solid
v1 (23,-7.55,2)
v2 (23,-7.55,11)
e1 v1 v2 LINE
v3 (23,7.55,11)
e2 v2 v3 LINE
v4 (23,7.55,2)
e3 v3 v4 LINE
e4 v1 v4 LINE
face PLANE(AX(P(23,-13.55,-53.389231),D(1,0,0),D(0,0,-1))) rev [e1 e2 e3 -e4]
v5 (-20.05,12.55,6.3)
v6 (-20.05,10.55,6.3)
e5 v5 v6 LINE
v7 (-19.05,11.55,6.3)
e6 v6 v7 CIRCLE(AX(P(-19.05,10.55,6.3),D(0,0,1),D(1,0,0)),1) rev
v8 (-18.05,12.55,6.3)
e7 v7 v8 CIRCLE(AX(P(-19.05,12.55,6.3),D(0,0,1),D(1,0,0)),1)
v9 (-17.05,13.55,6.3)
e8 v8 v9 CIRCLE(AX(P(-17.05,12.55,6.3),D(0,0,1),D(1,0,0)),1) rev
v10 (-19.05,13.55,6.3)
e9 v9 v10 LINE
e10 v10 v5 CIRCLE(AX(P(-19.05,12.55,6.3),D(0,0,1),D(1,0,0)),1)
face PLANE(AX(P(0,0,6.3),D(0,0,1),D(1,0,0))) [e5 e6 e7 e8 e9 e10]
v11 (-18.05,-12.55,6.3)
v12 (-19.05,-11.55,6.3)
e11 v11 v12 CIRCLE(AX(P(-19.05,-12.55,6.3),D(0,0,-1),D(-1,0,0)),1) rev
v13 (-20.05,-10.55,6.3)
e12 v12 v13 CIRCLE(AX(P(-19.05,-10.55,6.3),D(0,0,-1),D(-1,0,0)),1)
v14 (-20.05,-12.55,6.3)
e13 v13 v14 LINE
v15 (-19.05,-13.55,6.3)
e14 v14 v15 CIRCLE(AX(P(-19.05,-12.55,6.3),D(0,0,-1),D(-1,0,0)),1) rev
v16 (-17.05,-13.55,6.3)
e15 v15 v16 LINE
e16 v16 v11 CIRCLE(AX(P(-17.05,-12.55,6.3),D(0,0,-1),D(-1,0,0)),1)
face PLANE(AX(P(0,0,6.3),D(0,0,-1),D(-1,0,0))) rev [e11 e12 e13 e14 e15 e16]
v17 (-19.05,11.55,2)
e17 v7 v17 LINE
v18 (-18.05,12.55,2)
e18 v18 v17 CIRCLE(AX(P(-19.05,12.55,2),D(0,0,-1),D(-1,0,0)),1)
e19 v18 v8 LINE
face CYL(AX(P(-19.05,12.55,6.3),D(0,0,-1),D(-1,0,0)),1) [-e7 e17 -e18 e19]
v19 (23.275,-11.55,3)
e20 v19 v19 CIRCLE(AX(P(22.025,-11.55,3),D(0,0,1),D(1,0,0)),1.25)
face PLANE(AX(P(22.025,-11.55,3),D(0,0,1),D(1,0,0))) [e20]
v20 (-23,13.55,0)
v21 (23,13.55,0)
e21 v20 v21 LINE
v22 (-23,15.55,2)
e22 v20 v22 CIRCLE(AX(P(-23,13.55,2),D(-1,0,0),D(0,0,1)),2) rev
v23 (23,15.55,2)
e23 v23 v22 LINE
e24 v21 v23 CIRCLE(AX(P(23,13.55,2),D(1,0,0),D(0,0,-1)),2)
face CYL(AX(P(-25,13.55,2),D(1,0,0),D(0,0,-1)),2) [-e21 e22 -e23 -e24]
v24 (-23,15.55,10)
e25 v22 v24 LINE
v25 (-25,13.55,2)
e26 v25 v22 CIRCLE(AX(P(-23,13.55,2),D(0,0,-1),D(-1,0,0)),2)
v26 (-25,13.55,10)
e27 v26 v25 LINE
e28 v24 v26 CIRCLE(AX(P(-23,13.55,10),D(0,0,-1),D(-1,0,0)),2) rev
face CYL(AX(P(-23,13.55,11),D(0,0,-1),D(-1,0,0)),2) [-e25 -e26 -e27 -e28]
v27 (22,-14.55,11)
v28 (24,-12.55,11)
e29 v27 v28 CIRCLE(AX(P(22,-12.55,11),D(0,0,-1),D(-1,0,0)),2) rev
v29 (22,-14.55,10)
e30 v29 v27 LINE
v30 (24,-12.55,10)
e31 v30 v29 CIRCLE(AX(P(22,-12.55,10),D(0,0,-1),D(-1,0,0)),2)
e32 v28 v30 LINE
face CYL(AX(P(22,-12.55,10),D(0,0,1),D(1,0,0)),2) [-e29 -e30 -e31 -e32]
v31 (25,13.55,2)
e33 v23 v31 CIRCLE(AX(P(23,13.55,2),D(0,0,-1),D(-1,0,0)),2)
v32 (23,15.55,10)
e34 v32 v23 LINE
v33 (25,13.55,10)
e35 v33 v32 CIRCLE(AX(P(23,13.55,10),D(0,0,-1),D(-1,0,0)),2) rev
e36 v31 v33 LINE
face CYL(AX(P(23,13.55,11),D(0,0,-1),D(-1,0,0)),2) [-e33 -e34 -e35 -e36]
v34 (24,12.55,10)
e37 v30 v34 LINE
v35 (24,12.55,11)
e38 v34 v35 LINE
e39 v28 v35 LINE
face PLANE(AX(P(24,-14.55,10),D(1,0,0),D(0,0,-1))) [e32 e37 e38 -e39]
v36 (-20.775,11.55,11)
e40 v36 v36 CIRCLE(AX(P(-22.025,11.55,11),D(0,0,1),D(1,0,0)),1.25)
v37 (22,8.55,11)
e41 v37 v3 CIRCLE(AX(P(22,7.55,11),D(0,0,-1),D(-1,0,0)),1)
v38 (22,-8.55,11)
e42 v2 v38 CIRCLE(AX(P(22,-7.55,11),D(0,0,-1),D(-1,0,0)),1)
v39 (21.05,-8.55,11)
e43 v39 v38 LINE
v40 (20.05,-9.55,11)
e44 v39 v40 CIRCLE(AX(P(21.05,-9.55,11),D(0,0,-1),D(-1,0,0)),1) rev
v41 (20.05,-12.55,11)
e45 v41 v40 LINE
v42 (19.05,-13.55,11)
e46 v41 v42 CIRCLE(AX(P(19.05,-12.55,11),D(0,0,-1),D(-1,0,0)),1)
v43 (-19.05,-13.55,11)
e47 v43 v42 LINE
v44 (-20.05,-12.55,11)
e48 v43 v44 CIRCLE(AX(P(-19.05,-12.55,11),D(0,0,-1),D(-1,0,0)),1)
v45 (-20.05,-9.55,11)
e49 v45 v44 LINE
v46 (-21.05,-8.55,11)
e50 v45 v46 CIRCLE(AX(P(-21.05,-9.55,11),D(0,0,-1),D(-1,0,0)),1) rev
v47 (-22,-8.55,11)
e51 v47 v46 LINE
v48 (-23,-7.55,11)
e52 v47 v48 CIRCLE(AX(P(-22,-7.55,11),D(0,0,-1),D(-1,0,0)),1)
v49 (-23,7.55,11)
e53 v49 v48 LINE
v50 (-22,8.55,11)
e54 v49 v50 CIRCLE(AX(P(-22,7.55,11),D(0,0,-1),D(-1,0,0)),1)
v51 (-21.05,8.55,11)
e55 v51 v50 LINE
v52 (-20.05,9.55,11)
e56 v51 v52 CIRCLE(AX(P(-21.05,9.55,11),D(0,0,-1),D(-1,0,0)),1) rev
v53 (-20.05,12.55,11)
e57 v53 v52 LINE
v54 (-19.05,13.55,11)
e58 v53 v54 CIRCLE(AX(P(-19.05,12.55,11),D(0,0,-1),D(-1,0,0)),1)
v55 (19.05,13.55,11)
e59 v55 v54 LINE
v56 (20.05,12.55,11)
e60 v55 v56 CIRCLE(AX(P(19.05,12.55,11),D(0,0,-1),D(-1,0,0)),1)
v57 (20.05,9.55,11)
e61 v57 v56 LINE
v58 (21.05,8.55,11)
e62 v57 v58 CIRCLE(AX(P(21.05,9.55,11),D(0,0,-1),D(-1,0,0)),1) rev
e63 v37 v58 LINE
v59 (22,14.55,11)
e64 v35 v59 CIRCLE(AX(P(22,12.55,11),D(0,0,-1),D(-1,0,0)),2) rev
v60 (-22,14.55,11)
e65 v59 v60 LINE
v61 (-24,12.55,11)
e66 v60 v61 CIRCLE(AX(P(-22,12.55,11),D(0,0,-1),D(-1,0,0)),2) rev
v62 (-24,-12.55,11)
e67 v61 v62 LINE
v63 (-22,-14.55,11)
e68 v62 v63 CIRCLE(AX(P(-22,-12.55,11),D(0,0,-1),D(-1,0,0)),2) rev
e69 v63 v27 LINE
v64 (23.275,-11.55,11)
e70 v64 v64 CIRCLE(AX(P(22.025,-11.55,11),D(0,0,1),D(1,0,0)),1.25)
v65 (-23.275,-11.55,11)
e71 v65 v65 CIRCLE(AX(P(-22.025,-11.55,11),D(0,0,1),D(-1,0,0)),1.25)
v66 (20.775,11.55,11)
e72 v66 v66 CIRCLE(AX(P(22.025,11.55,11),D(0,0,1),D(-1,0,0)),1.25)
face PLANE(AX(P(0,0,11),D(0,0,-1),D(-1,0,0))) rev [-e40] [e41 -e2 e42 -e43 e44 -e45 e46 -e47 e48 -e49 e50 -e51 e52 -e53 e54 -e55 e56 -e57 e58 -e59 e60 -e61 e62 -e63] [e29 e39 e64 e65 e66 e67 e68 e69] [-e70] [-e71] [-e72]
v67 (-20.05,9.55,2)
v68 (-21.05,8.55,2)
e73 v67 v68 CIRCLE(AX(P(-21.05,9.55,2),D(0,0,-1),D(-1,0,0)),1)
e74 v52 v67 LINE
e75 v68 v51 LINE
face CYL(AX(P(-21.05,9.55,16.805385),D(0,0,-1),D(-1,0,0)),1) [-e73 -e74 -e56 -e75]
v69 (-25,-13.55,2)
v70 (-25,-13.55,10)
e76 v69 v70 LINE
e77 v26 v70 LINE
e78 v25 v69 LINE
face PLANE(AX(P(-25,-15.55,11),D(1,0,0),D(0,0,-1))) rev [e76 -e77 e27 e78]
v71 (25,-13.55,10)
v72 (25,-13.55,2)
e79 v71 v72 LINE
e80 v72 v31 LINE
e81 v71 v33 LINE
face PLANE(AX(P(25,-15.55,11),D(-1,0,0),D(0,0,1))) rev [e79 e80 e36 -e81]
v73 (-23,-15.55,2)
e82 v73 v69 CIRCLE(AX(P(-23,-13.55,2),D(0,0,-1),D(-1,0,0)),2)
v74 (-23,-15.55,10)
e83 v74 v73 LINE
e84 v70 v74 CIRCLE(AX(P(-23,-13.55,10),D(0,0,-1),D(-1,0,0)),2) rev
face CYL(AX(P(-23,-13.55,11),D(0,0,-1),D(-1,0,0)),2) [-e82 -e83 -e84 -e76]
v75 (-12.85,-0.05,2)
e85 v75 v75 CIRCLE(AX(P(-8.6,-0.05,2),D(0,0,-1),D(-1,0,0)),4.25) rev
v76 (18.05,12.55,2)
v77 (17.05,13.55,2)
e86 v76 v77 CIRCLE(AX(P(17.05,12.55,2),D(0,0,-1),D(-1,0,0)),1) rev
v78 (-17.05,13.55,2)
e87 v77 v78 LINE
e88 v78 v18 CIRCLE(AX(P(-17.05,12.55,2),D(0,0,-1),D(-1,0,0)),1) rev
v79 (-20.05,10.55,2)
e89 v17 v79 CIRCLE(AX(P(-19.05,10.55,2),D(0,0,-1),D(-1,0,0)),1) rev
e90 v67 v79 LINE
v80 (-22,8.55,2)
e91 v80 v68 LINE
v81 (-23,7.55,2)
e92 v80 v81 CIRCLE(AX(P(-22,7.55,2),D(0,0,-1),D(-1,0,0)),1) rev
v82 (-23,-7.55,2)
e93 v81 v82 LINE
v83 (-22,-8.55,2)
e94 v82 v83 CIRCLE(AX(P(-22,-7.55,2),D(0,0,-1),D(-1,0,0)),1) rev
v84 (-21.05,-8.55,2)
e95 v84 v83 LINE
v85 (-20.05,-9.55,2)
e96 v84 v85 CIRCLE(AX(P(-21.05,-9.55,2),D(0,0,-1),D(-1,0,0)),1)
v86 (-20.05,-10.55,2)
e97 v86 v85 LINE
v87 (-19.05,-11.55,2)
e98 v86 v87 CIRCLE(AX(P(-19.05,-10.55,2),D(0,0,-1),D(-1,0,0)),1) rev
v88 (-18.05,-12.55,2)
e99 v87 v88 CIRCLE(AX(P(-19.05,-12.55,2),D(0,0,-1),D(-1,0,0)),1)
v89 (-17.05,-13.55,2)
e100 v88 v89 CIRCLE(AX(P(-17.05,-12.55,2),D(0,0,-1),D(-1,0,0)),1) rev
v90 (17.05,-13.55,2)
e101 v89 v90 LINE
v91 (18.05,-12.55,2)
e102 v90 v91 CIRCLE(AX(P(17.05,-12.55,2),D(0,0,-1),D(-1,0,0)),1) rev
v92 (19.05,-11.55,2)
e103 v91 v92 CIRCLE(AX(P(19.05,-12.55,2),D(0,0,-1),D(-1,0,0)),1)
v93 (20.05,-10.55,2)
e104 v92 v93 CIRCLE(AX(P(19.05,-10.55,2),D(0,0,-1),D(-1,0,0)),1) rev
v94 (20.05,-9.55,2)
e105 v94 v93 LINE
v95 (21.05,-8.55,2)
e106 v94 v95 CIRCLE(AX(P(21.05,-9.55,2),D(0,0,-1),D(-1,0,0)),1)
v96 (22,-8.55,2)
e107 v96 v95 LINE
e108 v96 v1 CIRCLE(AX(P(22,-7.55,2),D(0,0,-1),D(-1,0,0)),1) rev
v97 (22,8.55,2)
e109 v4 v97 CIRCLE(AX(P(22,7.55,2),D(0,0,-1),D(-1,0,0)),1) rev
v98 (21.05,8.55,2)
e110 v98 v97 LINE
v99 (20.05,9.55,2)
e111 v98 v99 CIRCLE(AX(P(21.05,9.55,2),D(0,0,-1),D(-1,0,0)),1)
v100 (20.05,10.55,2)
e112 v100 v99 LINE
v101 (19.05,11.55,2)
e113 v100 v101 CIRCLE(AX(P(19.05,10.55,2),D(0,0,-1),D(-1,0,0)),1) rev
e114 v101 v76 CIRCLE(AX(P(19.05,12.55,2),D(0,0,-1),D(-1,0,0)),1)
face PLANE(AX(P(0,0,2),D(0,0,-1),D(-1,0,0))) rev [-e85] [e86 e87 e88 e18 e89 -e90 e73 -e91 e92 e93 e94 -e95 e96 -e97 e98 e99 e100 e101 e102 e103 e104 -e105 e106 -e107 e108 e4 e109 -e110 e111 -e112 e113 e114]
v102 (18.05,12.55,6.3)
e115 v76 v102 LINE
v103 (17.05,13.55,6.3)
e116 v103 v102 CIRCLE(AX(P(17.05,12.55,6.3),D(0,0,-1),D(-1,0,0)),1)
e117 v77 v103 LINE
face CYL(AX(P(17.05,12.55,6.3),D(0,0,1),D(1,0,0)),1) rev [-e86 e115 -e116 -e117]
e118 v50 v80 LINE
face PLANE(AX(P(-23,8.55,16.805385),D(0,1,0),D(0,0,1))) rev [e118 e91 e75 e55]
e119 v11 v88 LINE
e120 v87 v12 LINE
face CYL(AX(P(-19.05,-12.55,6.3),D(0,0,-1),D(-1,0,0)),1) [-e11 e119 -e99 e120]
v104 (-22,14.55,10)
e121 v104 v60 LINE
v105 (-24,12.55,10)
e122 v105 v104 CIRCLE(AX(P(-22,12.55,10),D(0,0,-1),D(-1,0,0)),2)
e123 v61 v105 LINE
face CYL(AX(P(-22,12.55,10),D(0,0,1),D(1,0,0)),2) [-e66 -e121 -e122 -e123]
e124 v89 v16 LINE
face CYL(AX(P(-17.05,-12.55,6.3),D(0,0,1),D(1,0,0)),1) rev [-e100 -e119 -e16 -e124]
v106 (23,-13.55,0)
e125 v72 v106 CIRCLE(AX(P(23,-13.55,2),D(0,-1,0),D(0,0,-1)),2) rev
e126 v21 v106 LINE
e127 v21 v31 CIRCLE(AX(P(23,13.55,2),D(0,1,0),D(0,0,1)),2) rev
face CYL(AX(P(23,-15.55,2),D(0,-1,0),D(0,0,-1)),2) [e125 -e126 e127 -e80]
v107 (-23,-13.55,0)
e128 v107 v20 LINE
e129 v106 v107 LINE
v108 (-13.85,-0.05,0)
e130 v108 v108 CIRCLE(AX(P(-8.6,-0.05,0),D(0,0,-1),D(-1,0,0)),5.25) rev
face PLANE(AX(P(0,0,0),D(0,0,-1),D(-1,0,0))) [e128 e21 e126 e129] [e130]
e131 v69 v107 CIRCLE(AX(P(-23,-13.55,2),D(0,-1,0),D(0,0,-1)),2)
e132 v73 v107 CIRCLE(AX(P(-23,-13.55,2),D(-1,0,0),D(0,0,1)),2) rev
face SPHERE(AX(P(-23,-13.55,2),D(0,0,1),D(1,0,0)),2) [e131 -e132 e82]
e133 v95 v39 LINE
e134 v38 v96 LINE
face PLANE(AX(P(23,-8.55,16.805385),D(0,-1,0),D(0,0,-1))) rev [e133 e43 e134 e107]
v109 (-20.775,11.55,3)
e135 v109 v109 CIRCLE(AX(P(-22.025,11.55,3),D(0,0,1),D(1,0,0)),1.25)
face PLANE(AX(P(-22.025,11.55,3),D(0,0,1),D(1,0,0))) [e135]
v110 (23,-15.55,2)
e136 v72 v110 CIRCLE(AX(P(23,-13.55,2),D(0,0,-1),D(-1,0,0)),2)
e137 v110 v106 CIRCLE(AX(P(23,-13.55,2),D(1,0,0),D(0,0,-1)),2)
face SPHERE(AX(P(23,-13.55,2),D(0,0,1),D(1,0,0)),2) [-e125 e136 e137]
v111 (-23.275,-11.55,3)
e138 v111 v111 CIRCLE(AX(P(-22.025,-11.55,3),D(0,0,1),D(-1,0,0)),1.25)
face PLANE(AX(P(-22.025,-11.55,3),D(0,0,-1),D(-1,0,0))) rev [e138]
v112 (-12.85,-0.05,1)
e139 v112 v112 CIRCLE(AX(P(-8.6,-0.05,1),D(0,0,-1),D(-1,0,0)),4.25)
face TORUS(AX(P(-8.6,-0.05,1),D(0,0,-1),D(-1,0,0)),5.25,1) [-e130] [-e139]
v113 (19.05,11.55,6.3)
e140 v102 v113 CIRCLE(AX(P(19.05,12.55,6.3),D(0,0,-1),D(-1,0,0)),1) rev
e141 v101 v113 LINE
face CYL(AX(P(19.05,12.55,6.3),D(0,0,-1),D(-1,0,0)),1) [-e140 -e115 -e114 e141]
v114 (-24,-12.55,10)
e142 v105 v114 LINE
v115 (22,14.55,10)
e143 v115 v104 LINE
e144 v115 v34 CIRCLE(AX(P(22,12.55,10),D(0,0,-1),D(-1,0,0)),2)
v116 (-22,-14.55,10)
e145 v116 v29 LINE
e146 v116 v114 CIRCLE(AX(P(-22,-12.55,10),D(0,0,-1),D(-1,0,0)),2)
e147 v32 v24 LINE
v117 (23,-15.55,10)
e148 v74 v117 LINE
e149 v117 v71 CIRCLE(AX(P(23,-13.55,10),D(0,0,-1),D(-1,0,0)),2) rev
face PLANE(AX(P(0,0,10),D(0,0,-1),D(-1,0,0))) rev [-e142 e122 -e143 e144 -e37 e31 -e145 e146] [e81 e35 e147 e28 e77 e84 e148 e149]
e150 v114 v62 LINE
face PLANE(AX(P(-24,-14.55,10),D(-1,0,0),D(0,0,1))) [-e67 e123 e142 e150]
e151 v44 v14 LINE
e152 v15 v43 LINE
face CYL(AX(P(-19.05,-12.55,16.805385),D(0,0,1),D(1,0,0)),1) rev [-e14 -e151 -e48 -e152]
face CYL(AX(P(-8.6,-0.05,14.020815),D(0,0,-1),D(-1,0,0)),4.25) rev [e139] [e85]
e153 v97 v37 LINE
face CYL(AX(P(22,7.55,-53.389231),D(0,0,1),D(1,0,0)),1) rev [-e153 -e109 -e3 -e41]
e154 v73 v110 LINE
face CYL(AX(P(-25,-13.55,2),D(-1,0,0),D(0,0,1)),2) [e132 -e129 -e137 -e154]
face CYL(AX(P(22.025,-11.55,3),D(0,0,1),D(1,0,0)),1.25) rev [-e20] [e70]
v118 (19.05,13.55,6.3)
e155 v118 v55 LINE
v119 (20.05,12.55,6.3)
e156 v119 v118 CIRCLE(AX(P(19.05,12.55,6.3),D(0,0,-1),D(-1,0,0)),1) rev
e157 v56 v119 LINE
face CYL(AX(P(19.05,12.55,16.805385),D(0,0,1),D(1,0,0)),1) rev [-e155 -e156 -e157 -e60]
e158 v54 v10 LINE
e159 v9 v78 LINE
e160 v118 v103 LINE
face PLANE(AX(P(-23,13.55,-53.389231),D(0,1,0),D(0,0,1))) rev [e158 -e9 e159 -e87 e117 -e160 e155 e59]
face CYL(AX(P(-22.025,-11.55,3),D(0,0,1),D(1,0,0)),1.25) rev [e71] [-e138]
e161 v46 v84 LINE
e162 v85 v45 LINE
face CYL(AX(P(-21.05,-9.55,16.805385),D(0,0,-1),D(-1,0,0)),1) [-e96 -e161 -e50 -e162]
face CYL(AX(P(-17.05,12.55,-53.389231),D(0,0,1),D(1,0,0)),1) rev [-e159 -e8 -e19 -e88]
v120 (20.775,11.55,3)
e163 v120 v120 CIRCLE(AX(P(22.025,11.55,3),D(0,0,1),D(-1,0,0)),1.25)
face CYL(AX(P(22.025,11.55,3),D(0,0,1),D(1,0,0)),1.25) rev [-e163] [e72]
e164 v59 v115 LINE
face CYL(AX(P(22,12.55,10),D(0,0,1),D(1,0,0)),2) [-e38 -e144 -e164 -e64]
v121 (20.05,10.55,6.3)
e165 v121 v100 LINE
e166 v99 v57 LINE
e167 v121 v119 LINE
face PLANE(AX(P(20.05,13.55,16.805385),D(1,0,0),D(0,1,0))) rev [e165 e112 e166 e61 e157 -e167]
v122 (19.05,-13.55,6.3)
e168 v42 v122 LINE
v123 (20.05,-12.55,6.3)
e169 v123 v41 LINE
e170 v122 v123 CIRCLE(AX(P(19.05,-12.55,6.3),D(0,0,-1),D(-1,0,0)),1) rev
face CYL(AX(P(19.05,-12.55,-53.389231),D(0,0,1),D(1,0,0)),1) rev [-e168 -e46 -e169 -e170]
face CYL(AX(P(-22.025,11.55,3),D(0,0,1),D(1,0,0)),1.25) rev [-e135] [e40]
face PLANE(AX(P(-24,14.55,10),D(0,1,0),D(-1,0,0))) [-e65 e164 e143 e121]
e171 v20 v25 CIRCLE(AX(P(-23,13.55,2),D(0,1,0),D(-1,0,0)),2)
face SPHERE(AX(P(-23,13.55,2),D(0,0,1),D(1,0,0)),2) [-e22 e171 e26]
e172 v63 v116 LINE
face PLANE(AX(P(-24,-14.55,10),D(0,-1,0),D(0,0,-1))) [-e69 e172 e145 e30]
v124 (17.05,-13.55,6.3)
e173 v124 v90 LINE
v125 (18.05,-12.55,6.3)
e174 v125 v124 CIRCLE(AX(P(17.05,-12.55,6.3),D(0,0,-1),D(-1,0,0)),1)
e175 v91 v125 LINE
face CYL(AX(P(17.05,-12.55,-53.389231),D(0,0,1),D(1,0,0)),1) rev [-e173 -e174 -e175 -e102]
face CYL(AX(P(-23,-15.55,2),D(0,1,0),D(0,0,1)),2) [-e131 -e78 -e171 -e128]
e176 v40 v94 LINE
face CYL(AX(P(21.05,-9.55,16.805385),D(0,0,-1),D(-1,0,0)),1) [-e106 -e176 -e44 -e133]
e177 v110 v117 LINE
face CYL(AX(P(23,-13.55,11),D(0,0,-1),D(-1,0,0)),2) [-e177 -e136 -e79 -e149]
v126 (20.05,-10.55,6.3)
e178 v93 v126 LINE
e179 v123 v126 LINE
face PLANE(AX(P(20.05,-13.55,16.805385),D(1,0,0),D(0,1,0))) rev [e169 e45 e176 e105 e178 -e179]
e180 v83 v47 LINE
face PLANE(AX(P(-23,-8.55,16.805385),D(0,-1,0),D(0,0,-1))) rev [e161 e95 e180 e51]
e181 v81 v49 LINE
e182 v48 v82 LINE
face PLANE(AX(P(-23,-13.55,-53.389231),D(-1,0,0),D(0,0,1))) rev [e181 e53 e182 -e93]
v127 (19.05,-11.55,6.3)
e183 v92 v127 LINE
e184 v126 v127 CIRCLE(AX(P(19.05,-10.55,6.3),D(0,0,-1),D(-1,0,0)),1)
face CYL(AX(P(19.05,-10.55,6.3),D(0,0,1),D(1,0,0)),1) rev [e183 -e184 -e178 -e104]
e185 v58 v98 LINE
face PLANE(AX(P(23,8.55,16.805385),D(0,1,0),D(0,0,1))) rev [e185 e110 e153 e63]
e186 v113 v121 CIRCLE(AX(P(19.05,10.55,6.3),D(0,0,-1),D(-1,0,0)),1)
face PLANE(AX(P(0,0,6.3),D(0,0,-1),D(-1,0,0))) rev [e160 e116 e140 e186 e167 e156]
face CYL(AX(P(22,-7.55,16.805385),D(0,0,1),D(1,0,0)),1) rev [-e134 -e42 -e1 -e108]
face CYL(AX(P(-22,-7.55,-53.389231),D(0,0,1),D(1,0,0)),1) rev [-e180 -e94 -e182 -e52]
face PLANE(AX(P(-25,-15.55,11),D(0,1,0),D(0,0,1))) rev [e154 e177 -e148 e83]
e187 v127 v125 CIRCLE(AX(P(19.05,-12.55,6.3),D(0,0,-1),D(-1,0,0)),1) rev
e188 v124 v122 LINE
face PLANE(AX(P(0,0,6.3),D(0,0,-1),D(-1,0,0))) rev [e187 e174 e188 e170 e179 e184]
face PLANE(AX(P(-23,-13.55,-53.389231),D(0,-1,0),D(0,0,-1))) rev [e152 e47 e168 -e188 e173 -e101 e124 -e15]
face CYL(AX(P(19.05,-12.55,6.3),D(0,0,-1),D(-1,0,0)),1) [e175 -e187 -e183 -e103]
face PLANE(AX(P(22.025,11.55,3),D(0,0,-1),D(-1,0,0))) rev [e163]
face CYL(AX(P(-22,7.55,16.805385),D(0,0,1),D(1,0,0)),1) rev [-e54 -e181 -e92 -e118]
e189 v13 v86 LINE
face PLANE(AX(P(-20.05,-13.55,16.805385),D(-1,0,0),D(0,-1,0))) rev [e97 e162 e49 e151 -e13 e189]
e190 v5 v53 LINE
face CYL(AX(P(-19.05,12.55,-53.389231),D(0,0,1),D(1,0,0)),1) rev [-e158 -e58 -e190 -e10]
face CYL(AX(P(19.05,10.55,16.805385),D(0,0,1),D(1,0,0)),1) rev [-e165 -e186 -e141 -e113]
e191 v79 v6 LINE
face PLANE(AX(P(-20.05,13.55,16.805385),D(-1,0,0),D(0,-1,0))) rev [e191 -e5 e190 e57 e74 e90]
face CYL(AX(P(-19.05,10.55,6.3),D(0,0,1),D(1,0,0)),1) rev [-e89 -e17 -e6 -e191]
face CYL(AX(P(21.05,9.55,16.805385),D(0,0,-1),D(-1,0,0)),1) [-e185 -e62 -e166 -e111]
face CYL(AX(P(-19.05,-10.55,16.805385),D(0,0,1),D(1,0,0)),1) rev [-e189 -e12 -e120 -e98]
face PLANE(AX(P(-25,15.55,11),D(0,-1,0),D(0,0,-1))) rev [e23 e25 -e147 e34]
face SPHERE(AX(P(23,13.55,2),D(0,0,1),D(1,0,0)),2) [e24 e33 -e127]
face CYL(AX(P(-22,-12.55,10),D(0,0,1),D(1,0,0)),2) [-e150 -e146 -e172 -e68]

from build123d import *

# Parameters (mm, degrees)
SKETCH1_W           = 50
SKETCH1_H           = 31.1
BOSS_EXTRUDE1_DEPTH = 11
SKETCH2_W           = 46
SKETCH2_H           = 27.1
CUT_EXTRUDE1_DEPTH  = 9
SKETCH3_R           = 4.25
CUT_EXTRUDE2_DEPTH  = 2
FILLET1_R           = 1
SKETCH4_W           = 50
SKETCH4_H           = 31.1
SKETCH4_W_2         = 48
SKETCH4_H_2         = 29.1
CUT_EXTRUDE3_DEPTH  = 1
SKETCH5_W           = 2.95
SKETCH5_H           = 5
BOSS_EXTRUDE2_DEPTH = 9
SKETCH6_R           = 1.25
CUT_EXTRUDE4_DEPTH  = 8
FILLET2_R           = 2
SKETCH7_W           = 2
SKETCH7_H           = 2
BOSS_EXTRUDE3_DEPTH = 4.3
FILLET3_R           = 1


with BuildPart() as part:
    # Sketch1 → Boss-Extrude1 (new body)
    with BuildSketch(Plane.XY):
        Rectangle(SKETCH1_W, SKETCH1_H)
    extrude(amount=BOSS_EXTRUDE1_DEPTH)

    # Sketch2 → Cut-Extrude1 (cut)
    with BuildSketch(Plane.XY.offset(11)):
        Rectangle(SKETCH2_W, SKETCH2_H)
    extrude(amount=-CUT_EXTRUDE1_DEPTH, mode=Mode.SUBTRACT)

    # Sketch3 → Cut-Extrude2 (cut)
    with BuildSketch(Plane(origin=(0, 0, 0), x_dir=(-1, 0, 0), z_dir=(0, 0, -1))):
        with Locations((8.6, -0.05)):
            Circle(SKETCH3_R)
    extrude(amount=-CUT_EXTRUDE2_DEPTH, mode=Mode.SUBTRACT)

    # Fillet1
    fillet1_edges = [part.edges().sort_by_distance(p)[0] for p in [
        (-4.35, -0.05, 0),
    ]]
    fillet(fillet1_edges, radius=FILLET1_R)

    # Sketch4 → Cut-Extrude3 (cut)
    with BuildSketch(Plane.XY.offset(11)):
        Rectangle(SKETCH4_W, SKETCH4_H)
        Rectangle(SKETCH4_W_2, SKETCH4_H_2, mode=Mode.SUBTRACT)
    extrude(amount=-CUT_EXTRUDE3_DEPTH, mode=Mode.SUBTRACT)

    # Sketch5 → Boss-Extrude2 (add)
    with BuildSketch(Plane.XY.offset(2)):
        with Locations((-21.525, 11.05)):
            Rectangle(SKETCH5_W, SKETCH5_H)
        with Locations((21.525, 11.05)):
            Rectangle(SKETCH5_W, SKETCH5_H)
        with Locations((-21.525, -11.05)):
            Rectangle(SKETCH5_W, SKETCH5_H)
        with Locations((21.525, -11.05)):
            Rectangle(SKETCH5_W, SKETCH5_H)
    extrude(amount=BOSS_EXTRUDE2_DEPTH)

    # Sketch6 → Cut-Extrude4 (cut)
    with BuildSketch(Plane.XY.offset(11)):
        with Locations((-22.025, 11.55)):
            Circle(SKETCH6_R)
        with Locations(Location((22.025, 11.55, 0), (0, 0, 180))):
            Circle(SKETCH6_R)
        with Locations(Location((-22.025, -11.55, 0), (0, 0, 180))):
            Circle(SKETCH6_R)
        with Locations((22.025, -11.55)):
            Circle(SKETCH6_R)
    extrude(amount=-CUT_EXTRUDE4_DEPTH, mode=Mode.SUBTRACT)

    # Fillet2
    fillet2_edges = [part.edges().sort_by_distance(p)[0] for p in [
        (25, -15.55, 5),
        (-25, -15.55, 5),
        (-25, 15.55, 5),
        (25, 15.55, 5),
        (24, -14.55, 10.5),
        (0, -15.55, 0),
        (-24, -14.55, 10.5),
        (-24, 14.55, 10.5),
        (24, 14.55, 10.5),
        (-25, 0, 0),
        (0, 15.55, 0),
        (25, 0, 0),
    ]]
    fillet(fillet2_edges, radius=FILLET2_R)

    # Sketch7 → Boss-Extrude3 (add)
    with BuildSketch(Plane.XY.offset(2)):
        with Locations((-19.05, 12.55)):
            Rectangle(SKETCH7_W, SKETCH7_H)
        with Locations((19.05, 12.55)):
            Rectangle(SKETCH7_W, SKETCH7_H)
        with Locations((19.05, -12.55)):
            Rectangle(SKETCH7_W, SKETCH7_H)
        with Locations((-19.05, -12.55)):
            Rectangle(SKETCH7_W, SKETCH7_H)
    extrude(amount=BOSS_EXTRUDE3_DEPTH)

    # Fillet3
    fillet3_edges = [part.edges().sort_by_distance(p)[0] for p in [
        (23, 8.55, 6.5),
        (20.05, 8.55, 6.5),
        (20.05, 13.55, 8.65),
        (-20.05, 13.55, 8.65),
        (-23, 8.55, 6.5),
        (-23, -8.55, 6.5),
        (-20.05, -8.55, 6.5),
        (-20.05, -13.55, 8.65),
        (20.05, -13.55, 8.65),
        (20.05, -8.55, 6.5),
        (23, -8.55, 6.5),
        (-20.05, 8.55, 6.5),
        (-18.05, -11.55, 4.15),
        (-20.05, -11.55, 4.15),
        (-18.05, 11.55, 4.15),
        (-18.05, 13.55, 4.15),
        (18.05, 13.55, 4.15),
        (18.05, 11.55, 4.15),
        (20.05, 11.55, 4.15),
        (20.05, -11.55, 4.15),
        (18.05, -11.55, 4.15),
        (18.05, -13.55, 4.15),
        (-18.05, -13.55, 4.15),
        (-20.05, 11.55, 4.15),
    ]]
    fillet(fillet3_edges, radius=FILLET3_R - 0.0001)  # a hair under: the kernel refuses the full size


solid = part.part
